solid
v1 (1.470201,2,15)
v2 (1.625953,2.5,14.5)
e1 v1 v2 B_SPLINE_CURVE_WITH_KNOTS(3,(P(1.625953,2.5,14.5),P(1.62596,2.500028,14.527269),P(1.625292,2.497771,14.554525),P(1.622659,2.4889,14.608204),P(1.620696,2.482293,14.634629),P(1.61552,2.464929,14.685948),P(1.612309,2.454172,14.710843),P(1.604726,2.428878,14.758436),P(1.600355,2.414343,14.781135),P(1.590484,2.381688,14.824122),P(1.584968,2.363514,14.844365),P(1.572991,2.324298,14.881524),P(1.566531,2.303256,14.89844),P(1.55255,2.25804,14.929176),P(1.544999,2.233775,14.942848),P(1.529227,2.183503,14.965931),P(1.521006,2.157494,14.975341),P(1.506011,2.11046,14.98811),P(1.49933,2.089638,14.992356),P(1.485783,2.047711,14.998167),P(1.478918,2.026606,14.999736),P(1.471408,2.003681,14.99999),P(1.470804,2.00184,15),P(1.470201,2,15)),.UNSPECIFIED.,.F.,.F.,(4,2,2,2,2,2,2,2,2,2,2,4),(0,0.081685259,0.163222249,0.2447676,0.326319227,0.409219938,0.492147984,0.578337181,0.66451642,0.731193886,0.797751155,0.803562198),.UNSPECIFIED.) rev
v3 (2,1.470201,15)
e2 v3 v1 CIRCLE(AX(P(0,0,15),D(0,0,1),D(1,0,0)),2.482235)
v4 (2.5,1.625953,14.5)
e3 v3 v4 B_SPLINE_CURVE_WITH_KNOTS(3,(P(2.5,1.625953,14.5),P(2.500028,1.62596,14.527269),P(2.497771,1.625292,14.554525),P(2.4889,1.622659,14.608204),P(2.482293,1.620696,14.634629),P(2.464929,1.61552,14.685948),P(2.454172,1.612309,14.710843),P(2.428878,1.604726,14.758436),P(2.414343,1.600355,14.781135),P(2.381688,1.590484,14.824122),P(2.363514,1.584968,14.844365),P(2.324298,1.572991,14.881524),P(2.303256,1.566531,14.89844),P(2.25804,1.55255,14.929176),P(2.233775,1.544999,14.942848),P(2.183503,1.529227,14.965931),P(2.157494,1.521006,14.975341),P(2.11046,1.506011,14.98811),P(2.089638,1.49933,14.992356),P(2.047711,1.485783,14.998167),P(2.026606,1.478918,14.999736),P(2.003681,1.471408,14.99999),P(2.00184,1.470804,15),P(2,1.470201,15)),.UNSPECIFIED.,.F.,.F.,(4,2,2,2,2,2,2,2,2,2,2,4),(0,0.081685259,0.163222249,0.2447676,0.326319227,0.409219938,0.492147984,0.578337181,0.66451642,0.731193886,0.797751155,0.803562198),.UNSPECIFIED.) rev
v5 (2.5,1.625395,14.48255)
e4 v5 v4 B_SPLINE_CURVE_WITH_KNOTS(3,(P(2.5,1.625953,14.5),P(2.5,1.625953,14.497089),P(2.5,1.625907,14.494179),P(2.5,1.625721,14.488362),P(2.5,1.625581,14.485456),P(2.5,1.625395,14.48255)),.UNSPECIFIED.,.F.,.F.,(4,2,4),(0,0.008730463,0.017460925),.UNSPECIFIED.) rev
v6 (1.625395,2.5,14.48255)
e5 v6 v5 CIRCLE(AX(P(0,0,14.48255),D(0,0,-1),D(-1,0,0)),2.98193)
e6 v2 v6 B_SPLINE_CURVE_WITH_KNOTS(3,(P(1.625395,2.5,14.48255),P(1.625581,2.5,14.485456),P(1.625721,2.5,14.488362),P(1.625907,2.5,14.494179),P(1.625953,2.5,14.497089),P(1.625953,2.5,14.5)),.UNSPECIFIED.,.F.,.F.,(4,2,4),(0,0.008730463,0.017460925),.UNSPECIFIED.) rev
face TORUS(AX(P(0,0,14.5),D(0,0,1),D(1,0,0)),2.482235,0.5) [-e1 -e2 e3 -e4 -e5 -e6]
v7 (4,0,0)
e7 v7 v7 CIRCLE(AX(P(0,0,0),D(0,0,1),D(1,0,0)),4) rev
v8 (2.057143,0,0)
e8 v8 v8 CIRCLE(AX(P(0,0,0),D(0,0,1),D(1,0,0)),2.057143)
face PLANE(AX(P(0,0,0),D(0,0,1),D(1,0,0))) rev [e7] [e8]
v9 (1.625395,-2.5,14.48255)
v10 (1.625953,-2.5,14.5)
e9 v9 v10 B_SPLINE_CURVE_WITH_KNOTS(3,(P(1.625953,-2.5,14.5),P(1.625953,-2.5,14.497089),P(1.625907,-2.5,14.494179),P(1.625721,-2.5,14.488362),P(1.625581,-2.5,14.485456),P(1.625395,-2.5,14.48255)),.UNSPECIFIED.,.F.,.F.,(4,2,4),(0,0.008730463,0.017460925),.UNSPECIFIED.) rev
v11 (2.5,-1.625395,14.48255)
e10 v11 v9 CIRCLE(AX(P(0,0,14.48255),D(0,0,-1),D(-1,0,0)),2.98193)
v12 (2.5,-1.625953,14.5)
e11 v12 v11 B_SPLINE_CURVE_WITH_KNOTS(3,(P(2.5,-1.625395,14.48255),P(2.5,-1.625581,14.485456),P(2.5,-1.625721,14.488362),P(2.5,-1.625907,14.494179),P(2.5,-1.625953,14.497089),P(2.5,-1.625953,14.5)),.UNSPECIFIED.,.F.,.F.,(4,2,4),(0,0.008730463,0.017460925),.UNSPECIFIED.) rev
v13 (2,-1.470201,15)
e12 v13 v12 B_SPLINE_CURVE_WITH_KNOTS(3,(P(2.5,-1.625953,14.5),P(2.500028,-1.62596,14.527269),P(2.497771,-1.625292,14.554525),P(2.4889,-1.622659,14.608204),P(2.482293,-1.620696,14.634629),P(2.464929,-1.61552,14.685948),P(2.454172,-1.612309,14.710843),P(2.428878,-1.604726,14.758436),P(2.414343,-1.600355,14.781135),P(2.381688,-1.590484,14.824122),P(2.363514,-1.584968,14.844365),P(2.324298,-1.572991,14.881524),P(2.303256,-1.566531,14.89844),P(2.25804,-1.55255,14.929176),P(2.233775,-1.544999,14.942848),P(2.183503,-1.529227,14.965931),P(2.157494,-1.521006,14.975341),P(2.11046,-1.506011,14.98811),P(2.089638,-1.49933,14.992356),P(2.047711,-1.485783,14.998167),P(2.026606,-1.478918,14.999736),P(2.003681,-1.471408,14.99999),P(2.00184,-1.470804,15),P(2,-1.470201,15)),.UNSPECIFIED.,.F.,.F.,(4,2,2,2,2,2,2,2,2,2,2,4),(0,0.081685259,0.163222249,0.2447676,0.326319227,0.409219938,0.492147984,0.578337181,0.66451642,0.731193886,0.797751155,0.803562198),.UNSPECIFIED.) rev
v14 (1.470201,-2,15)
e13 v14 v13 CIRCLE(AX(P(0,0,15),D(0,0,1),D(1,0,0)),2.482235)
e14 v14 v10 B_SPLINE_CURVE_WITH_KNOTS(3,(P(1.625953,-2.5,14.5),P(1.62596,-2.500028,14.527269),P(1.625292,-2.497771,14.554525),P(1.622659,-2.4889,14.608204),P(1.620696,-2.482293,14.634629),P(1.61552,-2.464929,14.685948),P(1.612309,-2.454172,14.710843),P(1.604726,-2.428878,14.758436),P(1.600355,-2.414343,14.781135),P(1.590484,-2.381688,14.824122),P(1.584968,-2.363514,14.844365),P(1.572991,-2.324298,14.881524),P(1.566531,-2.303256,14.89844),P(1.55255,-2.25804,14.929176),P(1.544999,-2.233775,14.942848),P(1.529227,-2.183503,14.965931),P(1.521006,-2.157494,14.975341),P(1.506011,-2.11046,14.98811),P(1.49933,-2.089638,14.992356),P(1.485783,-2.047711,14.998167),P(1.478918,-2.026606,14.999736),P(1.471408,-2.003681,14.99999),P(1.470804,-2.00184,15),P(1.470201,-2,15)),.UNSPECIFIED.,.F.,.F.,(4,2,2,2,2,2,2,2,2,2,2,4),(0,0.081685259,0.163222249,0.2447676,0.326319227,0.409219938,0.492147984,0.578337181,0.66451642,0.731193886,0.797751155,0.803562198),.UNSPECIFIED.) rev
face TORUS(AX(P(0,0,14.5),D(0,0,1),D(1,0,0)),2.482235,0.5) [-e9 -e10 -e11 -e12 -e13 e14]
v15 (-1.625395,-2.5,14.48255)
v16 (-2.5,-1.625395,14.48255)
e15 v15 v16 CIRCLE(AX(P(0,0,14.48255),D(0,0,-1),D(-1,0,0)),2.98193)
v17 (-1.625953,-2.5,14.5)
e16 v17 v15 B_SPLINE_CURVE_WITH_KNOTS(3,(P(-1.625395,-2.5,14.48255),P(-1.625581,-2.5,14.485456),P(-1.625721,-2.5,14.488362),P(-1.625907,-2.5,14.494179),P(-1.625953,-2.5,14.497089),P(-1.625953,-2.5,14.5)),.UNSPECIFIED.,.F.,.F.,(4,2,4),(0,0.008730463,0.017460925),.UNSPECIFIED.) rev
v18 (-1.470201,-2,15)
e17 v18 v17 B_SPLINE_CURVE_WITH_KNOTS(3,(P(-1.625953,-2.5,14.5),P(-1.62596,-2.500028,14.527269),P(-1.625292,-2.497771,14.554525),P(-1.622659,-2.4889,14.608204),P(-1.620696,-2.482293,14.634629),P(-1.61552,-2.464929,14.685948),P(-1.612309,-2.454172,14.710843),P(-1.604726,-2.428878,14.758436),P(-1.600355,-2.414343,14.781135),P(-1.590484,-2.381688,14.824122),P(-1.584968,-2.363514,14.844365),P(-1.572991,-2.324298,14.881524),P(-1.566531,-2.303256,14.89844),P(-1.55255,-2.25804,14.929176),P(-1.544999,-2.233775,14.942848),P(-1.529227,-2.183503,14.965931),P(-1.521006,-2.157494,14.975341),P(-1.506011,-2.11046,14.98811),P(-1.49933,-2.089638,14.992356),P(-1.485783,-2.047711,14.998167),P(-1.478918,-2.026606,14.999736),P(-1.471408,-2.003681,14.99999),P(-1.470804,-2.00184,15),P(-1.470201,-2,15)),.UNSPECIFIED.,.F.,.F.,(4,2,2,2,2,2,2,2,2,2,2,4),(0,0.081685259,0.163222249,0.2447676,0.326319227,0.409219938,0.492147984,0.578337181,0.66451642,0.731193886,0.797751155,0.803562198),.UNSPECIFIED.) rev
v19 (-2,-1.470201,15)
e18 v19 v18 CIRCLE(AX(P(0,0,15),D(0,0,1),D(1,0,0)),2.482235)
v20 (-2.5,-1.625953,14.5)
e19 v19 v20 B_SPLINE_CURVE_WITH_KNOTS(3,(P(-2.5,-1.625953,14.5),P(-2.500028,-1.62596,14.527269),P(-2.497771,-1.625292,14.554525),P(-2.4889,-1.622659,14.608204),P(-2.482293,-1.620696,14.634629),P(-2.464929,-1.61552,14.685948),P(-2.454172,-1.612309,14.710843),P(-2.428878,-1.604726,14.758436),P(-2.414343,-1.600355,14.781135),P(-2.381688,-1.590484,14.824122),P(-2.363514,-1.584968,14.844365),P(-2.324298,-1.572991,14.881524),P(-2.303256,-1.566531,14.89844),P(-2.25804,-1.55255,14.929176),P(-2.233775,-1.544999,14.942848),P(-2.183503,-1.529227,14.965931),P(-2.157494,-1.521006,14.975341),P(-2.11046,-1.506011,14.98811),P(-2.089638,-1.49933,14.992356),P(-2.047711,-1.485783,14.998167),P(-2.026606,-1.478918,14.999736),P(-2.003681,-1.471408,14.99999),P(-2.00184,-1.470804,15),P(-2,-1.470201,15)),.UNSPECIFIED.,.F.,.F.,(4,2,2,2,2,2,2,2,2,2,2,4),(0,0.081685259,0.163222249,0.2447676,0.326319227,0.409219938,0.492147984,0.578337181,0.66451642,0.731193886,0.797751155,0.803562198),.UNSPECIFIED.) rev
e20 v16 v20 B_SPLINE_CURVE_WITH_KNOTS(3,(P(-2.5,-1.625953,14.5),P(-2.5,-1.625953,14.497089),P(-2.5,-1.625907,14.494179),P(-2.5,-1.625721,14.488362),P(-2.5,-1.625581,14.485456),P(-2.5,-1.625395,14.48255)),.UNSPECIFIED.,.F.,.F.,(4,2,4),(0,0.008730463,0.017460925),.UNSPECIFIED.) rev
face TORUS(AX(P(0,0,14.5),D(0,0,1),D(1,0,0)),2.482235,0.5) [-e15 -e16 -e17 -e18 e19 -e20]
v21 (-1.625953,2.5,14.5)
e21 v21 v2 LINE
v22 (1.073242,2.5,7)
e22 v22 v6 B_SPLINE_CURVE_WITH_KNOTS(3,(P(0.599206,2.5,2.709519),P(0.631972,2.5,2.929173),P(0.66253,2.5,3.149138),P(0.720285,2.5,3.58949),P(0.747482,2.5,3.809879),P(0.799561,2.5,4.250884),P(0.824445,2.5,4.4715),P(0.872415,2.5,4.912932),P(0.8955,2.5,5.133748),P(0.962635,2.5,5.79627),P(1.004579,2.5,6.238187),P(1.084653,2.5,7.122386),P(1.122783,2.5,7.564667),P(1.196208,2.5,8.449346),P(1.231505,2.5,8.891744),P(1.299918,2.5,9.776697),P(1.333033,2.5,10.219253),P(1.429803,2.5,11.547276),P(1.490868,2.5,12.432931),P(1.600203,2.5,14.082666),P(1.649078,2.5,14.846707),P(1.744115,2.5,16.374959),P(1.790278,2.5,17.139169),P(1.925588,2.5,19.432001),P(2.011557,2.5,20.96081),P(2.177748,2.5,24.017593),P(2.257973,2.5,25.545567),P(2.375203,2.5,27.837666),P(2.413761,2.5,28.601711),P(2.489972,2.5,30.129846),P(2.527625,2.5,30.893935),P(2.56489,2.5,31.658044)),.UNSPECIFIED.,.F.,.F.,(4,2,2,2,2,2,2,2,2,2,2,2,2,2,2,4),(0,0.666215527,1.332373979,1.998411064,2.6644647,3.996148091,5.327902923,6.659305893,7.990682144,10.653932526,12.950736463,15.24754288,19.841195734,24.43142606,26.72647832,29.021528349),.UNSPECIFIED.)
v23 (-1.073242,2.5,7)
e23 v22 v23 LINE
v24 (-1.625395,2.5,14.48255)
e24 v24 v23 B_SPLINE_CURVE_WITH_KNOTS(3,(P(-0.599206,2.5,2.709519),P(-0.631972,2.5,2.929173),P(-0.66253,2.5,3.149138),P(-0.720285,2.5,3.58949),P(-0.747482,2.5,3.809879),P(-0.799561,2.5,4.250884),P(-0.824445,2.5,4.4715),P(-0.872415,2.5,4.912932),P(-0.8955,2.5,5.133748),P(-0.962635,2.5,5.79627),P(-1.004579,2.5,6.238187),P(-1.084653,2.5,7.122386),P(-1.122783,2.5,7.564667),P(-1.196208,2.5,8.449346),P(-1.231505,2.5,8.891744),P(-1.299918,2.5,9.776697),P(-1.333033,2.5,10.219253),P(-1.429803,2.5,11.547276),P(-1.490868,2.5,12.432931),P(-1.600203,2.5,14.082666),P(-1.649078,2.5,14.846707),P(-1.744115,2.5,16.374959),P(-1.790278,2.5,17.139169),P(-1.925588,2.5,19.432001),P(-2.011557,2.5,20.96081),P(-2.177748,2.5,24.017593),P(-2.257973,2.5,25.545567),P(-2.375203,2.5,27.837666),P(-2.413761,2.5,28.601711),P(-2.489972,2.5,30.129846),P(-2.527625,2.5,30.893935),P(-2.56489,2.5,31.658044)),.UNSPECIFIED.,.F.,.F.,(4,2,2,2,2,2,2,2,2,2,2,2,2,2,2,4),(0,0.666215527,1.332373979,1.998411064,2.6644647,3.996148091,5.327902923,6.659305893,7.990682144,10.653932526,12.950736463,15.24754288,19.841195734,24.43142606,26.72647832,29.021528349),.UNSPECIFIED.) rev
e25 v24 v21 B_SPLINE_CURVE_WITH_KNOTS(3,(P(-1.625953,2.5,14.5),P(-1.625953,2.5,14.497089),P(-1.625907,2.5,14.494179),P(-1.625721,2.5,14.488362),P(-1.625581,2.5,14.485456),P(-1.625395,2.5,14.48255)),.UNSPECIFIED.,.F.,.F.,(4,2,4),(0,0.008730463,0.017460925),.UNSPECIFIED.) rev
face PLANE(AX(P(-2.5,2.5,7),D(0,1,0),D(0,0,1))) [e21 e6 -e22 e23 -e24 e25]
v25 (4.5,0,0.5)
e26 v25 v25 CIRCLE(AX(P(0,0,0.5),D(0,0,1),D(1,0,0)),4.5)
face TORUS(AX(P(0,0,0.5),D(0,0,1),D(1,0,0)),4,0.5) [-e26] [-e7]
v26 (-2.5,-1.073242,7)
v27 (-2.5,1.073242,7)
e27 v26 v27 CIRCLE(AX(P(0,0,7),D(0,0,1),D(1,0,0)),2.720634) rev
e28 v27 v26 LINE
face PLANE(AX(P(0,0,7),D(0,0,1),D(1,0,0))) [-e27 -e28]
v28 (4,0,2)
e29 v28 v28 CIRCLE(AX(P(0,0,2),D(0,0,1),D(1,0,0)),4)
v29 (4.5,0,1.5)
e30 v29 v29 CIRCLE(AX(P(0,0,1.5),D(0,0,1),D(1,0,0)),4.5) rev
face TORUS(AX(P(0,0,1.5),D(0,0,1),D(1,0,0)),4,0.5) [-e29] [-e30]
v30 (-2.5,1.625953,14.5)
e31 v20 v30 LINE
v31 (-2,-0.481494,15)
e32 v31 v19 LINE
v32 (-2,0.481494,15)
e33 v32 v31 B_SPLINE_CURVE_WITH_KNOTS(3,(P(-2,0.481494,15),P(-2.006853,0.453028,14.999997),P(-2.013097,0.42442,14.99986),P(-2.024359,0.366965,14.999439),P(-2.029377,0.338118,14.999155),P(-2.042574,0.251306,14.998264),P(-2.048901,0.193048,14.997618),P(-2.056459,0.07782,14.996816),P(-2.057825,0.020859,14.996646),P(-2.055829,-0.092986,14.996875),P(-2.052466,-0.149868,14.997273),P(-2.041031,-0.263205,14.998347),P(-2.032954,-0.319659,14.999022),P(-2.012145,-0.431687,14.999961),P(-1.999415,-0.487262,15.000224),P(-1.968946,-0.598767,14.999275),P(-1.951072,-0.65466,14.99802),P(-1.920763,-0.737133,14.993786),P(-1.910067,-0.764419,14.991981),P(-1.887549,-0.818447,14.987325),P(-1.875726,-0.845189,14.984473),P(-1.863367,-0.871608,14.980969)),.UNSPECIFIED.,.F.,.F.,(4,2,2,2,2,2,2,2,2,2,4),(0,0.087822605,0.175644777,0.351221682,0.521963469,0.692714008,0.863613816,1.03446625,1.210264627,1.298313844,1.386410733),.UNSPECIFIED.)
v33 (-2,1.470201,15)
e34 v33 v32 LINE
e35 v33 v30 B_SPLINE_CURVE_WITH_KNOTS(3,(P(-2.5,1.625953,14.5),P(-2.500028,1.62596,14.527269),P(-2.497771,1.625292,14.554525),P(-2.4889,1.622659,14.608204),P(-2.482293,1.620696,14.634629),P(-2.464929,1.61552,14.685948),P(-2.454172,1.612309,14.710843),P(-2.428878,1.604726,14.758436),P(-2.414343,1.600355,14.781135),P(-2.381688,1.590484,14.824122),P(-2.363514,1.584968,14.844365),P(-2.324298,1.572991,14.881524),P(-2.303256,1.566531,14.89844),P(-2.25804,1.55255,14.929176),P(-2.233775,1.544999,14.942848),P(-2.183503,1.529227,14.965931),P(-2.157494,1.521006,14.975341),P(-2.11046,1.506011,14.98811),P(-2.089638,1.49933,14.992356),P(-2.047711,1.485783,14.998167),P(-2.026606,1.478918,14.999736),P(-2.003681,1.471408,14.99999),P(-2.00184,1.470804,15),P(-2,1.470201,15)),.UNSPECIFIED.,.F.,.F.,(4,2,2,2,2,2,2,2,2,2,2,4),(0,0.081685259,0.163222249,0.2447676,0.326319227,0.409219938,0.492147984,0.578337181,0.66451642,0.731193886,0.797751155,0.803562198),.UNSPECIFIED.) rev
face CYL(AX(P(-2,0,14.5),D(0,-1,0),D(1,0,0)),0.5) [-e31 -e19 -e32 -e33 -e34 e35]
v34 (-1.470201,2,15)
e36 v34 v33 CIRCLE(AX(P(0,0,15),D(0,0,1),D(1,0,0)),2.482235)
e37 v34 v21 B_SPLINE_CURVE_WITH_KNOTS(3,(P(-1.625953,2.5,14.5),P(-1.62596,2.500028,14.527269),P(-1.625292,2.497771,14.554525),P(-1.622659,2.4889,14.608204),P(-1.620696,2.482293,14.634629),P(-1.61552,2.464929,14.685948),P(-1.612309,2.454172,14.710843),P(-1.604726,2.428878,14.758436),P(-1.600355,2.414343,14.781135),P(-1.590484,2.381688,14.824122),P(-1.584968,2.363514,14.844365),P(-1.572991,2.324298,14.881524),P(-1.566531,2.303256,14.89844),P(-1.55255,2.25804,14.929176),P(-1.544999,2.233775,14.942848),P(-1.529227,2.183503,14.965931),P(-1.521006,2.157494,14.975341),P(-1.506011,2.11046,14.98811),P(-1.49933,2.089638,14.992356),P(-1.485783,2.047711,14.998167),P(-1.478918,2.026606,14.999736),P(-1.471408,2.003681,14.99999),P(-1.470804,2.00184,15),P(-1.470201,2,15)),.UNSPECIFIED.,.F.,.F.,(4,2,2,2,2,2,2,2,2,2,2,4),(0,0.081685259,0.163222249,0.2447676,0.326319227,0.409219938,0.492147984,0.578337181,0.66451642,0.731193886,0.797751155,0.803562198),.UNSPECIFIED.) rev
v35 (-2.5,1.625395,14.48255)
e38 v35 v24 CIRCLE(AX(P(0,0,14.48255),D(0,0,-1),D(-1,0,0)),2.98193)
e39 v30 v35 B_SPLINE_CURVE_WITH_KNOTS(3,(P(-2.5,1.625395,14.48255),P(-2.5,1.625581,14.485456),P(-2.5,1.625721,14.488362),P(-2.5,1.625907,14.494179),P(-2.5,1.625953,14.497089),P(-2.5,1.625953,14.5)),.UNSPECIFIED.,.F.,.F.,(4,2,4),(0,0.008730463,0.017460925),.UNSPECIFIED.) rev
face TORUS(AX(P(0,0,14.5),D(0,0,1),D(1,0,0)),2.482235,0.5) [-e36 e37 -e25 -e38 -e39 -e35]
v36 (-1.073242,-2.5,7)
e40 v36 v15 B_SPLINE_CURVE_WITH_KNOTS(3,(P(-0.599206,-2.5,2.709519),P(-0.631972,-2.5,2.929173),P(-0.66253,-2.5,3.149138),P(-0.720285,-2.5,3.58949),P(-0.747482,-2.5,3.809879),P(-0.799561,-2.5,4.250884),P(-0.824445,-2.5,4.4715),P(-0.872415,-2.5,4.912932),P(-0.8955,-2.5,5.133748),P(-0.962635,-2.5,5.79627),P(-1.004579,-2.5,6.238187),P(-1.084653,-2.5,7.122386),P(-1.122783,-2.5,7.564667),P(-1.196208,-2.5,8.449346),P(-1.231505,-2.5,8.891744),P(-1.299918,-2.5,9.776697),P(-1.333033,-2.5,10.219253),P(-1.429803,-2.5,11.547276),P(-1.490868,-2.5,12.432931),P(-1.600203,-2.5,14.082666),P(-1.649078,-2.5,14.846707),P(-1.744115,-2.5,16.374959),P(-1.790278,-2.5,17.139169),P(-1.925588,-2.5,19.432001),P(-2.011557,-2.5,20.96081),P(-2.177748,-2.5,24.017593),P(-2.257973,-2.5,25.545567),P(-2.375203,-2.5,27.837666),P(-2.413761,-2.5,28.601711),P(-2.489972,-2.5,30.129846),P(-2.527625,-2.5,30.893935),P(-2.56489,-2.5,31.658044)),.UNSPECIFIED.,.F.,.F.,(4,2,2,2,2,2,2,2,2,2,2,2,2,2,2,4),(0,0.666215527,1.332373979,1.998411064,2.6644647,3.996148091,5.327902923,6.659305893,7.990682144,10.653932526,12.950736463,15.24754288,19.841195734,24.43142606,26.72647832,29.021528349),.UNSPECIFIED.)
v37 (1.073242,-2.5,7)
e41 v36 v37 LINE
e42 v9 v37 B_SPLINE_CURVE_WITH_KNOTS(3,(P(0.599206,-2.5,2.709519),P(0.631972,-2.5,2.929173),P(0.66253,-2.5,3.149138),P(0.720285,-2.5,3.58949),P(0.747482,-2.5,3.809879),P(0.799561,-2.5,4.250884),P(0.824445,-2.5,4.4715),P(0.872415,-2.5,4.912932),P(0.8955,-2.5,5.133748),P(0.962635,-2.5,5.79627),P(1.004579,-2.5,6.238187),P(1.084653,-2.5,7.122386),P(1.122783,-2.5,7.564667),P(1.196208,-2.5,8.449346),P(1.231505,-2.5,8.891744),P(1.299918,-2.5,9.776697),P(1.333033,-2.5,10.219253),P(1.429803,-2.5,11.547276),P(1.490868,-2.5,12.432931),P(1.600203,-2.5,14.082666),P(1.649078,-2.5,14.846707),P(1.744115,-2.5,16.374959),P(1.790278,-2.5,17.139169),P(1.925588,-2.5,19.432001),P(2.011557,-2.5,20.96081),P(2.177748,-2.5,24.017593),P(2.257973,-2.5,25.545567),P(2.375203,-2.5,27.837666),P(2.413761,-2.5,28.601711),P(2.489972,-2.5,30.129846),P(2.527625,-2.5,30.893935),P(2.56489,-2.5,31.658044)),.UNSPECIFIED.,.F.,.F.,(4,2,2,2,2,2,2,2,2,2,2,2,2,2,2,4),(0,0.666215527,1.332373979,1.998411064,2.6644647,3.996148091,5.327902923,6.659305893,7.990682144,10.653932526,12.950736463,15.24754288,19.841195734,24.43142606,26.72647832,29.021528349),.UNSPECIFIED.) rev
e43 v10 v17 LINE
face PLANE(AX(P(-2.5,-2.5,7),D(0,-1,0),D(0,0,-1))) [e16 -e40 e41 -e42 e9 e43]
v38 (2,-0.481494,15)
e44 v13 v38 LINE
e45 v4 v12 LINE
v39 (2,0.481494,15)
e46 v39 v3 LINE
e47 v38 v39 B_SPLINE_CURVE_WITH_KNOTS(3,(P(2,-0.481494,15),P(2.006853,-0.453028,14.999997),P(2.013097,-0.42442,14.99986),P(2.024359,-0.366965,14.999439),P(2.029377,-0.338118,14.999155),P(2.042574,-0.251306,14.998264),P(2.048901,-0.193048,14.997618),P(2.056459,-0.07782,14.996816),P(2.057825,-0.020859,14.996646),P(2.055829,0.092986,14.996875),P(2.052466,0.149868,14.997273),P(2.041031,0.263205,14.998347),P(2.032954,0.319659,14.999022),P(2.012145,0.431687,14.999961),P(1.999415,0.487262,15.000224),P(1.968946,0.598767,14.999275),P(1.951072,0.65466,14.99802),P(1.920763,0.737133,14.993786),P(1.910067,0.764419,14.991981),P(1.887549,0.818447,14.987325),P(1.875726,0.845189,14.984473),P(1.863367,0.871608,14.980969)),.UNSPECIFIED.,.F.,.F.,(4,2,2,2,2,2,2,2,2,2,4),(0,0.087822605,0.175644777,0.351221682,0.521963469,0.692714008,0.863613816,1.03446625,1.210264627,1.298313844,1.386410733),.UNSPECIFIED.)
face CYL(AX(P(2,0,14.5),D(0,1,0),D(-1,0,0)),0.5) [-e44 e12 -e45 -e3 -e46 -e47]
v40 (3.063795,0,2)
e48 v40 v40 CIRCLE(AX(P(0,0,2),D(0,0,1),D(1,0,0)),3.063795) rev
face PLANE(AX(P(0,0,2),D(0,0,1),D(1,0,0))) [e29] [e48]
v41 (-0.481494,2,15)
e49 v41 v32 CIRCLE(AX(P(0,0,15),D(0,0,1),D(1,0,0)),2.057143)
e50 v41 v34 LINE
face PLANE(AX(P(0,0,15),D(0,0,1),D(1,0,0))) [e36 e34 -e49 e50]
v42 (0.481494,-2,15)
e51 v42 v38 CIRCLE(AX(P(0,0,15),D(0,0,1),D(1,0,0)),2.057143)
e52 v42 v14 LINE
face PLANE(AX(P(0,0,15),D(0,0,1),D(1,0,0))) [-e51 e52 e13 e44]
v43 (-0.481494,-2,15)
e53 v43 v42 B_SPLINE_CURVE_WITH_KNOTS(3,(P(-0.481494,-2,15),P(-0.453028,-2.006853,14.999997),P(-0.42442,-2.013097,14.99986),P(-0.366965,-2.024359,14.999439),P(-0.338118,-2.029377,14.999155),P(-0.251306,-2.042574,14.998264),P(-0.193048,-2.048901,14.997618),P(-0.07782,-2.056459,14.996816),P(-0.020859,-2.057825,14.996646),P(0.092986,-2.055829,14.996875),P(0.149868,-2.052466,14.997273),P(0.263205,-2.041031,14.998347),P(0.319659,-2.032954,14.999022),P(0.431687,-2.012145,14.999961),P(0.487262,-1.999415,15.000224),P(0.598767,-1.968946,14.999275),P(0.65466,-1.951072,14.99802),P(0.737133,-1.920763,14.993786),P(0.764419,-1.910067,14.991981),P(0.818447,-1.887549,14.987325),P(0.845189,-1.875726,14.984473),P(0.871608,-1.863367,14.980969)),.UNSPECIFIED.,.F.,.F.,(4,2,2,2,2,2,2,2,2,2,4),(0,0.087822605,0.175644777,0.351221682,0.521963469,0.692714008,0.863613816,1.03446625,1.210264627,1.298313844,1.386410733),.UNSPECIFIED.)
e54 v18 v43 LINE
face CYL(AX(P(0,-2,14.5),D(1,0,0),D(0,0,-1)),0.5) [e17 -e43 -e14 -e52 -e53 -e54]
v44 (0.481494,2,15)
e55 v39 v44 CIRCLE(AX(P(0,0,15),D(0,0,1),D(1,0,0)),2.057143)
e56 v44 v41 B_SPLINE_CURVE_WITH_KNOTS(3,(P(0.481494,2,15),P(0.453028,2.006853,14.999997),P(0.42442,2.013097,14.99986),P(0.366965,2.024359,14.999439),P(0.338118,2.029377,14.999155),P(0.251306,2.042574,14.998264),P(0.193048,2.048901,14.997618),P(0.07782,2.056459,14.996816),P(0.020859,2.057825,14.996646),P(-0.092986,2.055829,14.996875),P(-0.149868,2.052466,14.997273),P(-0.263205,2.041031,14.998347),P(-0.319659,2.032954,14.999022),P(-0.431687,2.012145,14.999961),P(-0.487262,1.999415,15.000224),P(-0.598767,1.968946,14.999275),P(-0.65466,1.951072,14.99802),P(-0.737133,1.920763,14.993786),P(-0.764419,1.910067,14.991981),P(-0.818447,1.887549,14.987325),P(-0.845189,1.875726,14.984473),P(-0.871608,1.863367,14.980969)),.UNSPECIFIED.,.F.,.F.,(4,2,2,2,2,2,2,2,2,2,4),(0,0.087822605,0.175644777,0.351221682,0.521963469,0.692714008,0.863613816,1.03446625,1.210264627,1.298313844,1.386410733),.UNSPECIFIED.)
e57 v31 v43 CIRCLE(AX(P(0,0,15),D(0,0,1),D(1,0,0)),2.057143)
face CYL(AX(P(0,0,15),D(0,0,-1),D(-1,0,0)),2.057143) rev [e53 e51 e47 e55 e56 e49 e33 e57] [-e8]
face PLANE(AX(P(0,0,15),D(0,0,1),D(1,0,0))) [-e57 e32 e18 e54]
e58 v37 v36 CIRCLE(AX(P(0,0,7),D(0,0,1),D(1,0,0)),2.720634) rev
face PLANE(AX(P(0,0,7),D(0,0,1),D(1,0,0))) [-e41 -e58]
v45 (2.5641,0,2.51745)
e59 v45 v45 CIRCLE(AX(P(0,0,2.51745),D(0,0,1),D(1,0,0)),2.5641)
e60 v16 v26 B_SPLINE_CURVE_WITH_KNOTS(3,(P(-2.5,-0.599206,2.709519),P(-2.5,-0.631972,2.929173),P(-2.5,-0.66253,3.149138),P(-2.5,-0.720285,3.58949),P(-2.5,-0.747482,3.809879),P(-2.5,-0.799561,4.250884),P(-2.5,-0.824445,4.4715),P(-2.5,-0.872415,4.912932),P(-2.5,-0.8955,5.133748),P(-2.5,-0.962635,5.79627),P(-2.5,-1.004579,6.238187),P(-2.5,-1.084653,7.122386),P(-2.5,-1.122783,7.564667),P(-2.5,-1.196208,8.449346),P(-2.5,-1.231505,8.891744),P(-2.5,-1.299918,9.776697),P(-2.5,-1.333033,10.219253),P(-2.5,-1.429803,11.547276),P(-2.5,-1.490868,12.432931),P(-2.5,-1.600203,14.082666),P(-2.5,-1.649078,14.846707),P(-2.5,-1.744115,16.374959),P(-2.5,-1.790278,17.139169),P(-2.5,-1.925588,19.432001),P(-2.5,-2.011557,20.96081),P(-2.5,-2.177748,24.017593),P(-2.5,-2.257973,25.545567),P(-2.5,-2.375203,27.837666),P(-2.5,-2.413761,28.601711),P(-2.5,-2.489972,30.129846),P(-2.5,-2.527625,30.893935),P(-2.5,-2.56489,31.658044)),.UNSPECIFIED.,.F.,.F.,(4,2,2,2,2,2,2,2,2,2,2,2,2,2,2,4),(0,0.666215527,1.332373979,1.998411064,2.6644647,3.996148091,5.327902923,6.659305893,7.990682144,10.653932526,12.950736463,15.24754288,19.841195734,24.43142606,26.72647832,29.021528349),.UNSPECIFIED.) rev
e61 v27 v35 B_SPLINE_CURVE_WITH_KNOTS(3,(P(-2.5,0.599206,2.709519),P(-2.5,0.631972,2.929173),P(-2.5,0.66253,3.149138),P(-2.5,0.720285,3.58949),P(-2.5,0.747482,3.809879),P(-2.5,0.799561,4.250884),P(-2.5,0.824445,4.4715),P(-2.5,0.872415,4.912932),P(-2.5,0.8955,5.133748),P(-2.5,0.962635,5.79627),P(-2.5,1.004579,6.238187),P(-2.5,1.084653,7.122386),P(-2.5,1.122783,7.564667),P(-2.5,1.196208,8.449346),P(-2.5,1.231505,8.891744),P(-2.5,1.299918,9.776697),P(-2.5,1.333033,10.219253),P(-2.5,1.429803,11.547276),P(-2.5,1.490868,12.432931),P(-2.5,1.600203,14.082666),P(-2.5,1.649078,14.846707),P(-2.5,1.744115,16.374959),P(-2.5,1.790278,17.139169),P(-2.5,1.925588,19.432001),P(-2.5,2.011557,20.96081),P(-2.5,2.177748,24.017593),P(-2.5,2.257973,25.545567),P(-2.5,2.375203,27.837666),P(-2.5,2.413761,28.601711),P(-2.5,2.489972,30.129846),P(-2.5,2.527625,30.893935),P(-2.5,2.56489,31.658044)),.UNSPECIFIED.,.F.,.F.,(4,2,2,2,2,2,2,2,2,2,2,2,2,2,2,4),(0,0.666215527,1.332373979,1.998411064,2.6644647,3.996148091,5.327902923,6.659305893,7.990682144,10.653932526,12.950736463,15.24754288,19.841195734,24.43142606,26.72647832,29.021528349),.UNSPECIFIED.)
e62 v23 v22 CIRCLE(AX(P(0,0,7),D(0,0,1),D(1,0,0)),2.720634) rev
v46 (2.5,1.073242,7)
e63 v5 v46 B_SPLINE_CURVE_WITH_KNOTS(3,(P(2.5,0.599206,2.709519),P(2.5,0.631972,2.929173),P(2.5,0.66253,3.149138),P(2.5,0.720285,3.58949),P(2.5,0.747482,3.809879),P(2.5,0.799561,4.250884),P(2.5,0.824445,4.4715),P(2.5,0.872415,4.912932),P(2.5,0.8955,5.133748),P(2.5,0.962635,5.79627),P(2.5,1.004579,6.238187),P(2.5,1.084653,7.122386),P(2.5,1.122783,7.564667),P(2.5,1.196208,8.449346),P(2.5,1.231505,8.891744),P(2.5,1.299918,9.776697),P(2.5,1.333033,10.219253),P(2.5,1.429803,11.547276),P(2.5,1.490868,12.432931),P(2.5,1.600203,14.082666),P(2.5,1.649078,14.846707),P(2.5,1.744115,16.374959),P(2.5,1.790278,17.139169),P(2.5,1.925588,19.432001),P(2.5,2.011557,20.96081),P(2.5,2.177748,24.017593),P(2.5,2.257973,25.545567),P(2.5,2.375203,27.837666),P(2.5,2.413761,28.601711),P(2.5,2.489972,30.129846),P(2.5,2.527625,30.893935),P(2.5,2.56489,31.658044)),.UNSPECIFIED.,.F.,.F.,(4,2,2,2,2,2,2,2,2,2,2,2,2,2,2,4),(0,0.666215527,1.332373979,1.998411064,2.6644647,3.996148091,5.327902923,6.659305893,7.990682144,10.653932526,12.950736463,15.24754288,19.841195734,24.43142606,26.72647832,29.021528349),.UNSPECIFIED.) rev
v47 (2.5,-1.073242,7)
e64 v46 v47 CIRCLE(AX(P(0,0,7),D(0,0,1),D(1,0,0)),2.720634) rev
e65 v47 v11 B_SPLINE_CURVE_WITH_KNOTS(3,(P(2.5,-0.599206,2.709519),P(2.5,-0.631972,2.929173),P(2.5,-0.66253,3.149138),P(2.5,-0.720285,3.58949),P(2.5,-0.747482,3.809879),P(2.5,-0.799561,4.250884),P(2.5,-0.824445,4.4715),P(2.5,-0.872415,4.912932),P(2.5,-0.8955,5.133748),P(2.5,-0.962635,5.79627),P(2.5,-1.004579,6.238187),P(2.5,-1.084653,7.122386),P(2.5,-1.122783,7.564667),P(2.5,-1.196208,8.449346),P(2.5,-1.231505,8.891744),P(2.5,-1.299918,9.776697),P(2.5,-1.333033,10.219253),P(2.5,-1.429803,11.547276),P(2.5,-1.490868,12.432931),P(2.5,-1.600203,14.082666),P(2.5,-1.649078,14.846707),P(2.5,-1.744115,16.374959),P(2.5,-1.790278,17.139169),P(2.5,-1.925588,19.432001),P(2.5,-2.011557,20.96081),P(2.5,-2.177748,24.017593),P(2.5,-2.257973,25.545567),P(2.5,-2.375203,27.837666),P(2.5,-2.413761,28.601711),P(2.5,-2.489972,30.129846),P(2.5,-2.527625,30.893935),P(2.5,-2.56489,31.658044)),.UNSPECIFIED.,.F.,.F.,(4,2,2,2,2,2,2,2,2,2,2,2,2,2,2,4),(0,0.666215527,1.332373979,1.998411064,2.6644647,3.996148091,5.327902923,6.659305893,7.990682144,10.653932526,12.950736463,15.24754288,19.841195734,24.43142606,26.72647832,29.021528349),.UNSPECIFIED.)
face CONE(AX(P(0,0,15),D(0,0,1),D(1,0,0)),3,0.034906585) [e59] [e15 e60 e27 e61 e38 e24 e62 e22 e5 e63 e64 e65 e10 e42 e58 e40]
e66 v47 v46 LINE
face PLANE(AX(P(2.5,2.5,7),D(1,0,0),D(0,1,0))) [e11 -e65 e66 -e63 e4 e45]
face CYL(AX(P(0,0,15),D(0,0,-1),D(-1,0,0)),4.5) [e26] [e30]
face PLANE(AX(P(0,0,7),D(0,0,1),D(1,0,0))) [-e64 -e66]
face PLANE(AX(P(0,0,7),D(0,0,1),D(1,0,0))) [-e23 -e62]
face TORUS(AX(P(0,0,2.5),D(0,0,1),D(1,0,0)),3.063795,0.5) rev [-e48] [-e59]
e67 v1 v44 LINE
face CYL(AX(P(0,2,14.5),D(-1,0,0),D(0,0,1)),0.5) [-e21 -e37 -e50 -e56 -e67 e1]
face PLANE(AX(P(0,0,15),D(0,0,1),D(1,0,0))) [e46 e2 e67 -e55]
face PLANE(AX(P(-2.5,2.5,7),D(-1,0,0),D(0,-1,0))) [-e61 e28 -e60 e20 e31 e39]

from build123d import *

# Parameters (mm, degrees)
SKETCH_1_R           = 4.5
SKETCH_1_R_2         = 2.057142857
EXTRUDE_1_DEPTH      = 15
SKETCH_2_OUTSIDE_W   = 15.842
SKETCH_2_OUTSIDE_H   = 15.842
SKETCH_2_OUTSIDE_R   = 3
CUT_EXTRUDE_1_DEPTH  = 13
CUT_EXTRUDE_1_DRAFT  = 2
SKETCH_3_OUTSIDE_W   = 14.934
SKETCH_3_OUTSIDE_H   = 14.934
SKETCH_3_OUTSIDE_W_2 = 5
SKETCH_3_OUTSIDE_H_2 = 5
CUT_EXTRUDE_2_DEPTH  = 8
FILLET_2_R           = 0.5
FILLET_3_R           = 0.5
FILLET_4_R           = 0.5
FILLET_5_R           = 0.5


with BuildPart() as part:
    # Эскиз1 → Бобышка-Вытянуть1 (new body)
    with BuildSketch(Plane.XY):
        Circle(SKETCH_1_R)
        Circle(SKETCH_1_R_2, mode=Mode.SUBTRACT)
    extrude(amount=EXTRUDE_1_DEPTH)


with BuildPart() as cut_extrude_1_tool:
    # Эскиз2 outside → Вырез-Вытянуть1 (with draft: the straight prism first)
    with BuildSketch(Plane.XY.offset(15)):
        Rectangle(SKETCH_2_OUTSIDE_W, SKETCH_2_OUTSIDE_H)
        Circle(SKETCH_2_OUTSIDE_R, mode=Mode.SUBTRACT)
    extrude(amount=-CUT_EXTRUDE_1_DEPTH)
    # Вырез-Вытянуть1: the draft: its side faces are tilted about the plane it starts from
    cut_extrude_1_sides = [cut_extrude_1_tool.faces().sort_by_distance(p)[0] for p in [
        (0, -7.921, 8.5),
        (7.921, 0, 8.5),
        (0, 7.921, 8.5),
        (-7.921, 0, 8.5),
        (-3, 0, 8.5),
    ]]
    draft(cut_extrude_1_sides, Plane.XY.offset(15), CUT_EXTRUDE_1_DRAFT)


with BuildPart() as part_1:
    add(part.part)

    # Вырез-Вытянуть1: cut by cut_extrude_1_tool
    add(cut_extrude_1_tool.part, mode=Mode.SUBTRACT)

    # Эскиз3 outside → Вырез-Вытянуть2 (cut)
    with BuildSketch(Plane.XY.offset(15)):
        Rectangle(SKETCH_3_OUTSIDE_W, SKETCH_3_OUTSIDE_H)
        Rectangle(SKETCH_3_OUTSIDE_W_2, SKETCH_3_OUTSIDE_H_2, mode=Mode.SUBTRACT)
    extrude(amount=-CUT_EXTRUDE_2_DEPTH, mode=Mode.SUBTRACT)

    # Скругление2
    # the kernel refuses this fillet: 0.5 mm, written as the material it takes off along each edge
    with BuildSketch(Plane(origin=(0, 0, 15), x_dir=(0.9881342002725989, 0.15359297591892496, 0), z_dir=(0.15359297591892496, -0.9881342002725989, 0))) as fillet_2_piece_1:
        with BuildLine():
            CenterArc((3 - FILLET_2_R * 1.03553031379, -FILLET_2_R), FILLET_2_R, 358, 92)
            Line((3 - FILLET_2_R * 1.03553031379, 0), (3, 0))
            Line((3, 0), (3 - FILLET_2_R * 0.0361394867715, -FILLET_2_R * 1.0348994967))
        make_face()
    revolve(axis=Axis((0, 0, 15), (0, 0, 1)), revolution_arc=72.329594827, mode=Mode.SUBTRACT)
    with BuildSketch(Plane(origin=(0, 0, 15), x_dir=(-0.1535929759189553, 0.9881342002725941, 0), z_dir=(0.9881342002725941, 0.1535929759189553, 0))) as fillet_2_piece_2:
        with BuildLine():
            CenterArc((3 - FILLET_2_R * 1.03553031379, -FILLET_2_R), FILLET_2_R, 358, 92)
            Line((3 - FILLET_2_R * 1.03553031379, 0), (3, 0))
            Line((3, 0), (3 - FILLET_2_R * 0.0361394867715, -FILLET_2_R * 1.0348994967))
        make_face()
    revolve(axis=Axis((0, 0, 15), (0, 0, 1)), revolution_arc=72.329594827, mode=Mode.SUBTRACT)
    with BuildSketch(Plane(origin=(0, 0, 15), x_dir=(-0.9881342002725968, -0.15359297591893833, 0), z_dir=(-0.15359297591893833, 0.9881342002725968, 0))) as fillet_2_piece_3:
        with BuildLine():
            CenterArc((3 - FILLET_2_R * 1.03553031379, -FILLET_2_R), FILLET_2_R, 358, 92)
            Line((3 - FILLET_2_R * 1.03553031379, 0), (3, 0))
            Line((3, 0), (3 - FILLET_2_R * 0.0361394867715, -FILLET_2_R * 1.0348994967))
        make_face()
    revolve(axis=Axis((0, 0, 15), (0, 0, 1)), revolution_arc=72.329594827, mode=Mode.SUBTRACT)
    with BuildSketch(Plane(origin=(0, 0, 15), x_dir=(0.15359297591892515, -0.9881342002725989, 0), z_dir=(-0.9881342002725989, -0.15359297591892515, 0))) as fillet_2_piece_4:
        with BuildLine():
            CenterArc((3 - FILLET_2_R * 1.03553031379, -FILLET_2_R), FILLET_2_R, 358, 92)
            Line((3 - FILLET_2_R * 1.03553031379, 0), (3, 0))
            Line((3, 0), (3 - FILLET_2_R * 0.0361394867715, -FILLET_2_R * 1.0348994967))
        make_face()
    revolve(axis=Axis((0, 0, 15), (0, 0, 1)), revolution_arc=72.329594827, mode=Mode.SUBTRACT)
    with BuildSketch(Plane(origin=(2.5, 2.908312395, 15), x_dir=(-1, 0, 0), z_dir=(0, -1, 0)), Plane(origin=(2.908312395, -2.5, 15), x_dir=(0, 1, 0), z_dir=(-1, 0, 0)), Plane(origin=(-2.5, -2.908312395, 15), x_dir=(1, 0, 0), z_dir=(0, 1, 0)), Plane(origin=(-2.908312395, 2.5, 15), x_dir=(0, -1, 0), z_dir=(1, 0, 0))) as fillet_2_piece_5:
        with BuildLine():
            CenterArc((FILLET_2_R, FILLET_2_R), FILLET_2_R, 180, 90)
            Line((0, FILLET_2_R), (0, 0))
            Line((0, 0), (FILLET_2_R, 0))
        make_face()
    extrude(amount=5.81662479, mode=Mode.SUBTRACT)

    # Скругление3
    fillet_3_edges = [part_1.edges().sort_by_distance(p)[0] for p in [
        (-2.546029997, 0, 2),
    ]]
    fillet(fillet_3_edges, radius=FILLET_3_R)

    # Скругление4
    fillet_4_edges = [part_1.edges().sort_by_distance(p)[0] for p in [
        (-4.5, 0, 2),
    ]]
    fillet(fillet_4_edges, radius=FILLET_4_R)

    # Скругление5
    fillet_5_edges = [part_1.edges().sort_by_distance(p)[0] for p in [
        (-4.5, 0, 0),
    ]]
    fillet(fillet_5_edges, radius=FILLET_5_R)


solid = part_1.part
